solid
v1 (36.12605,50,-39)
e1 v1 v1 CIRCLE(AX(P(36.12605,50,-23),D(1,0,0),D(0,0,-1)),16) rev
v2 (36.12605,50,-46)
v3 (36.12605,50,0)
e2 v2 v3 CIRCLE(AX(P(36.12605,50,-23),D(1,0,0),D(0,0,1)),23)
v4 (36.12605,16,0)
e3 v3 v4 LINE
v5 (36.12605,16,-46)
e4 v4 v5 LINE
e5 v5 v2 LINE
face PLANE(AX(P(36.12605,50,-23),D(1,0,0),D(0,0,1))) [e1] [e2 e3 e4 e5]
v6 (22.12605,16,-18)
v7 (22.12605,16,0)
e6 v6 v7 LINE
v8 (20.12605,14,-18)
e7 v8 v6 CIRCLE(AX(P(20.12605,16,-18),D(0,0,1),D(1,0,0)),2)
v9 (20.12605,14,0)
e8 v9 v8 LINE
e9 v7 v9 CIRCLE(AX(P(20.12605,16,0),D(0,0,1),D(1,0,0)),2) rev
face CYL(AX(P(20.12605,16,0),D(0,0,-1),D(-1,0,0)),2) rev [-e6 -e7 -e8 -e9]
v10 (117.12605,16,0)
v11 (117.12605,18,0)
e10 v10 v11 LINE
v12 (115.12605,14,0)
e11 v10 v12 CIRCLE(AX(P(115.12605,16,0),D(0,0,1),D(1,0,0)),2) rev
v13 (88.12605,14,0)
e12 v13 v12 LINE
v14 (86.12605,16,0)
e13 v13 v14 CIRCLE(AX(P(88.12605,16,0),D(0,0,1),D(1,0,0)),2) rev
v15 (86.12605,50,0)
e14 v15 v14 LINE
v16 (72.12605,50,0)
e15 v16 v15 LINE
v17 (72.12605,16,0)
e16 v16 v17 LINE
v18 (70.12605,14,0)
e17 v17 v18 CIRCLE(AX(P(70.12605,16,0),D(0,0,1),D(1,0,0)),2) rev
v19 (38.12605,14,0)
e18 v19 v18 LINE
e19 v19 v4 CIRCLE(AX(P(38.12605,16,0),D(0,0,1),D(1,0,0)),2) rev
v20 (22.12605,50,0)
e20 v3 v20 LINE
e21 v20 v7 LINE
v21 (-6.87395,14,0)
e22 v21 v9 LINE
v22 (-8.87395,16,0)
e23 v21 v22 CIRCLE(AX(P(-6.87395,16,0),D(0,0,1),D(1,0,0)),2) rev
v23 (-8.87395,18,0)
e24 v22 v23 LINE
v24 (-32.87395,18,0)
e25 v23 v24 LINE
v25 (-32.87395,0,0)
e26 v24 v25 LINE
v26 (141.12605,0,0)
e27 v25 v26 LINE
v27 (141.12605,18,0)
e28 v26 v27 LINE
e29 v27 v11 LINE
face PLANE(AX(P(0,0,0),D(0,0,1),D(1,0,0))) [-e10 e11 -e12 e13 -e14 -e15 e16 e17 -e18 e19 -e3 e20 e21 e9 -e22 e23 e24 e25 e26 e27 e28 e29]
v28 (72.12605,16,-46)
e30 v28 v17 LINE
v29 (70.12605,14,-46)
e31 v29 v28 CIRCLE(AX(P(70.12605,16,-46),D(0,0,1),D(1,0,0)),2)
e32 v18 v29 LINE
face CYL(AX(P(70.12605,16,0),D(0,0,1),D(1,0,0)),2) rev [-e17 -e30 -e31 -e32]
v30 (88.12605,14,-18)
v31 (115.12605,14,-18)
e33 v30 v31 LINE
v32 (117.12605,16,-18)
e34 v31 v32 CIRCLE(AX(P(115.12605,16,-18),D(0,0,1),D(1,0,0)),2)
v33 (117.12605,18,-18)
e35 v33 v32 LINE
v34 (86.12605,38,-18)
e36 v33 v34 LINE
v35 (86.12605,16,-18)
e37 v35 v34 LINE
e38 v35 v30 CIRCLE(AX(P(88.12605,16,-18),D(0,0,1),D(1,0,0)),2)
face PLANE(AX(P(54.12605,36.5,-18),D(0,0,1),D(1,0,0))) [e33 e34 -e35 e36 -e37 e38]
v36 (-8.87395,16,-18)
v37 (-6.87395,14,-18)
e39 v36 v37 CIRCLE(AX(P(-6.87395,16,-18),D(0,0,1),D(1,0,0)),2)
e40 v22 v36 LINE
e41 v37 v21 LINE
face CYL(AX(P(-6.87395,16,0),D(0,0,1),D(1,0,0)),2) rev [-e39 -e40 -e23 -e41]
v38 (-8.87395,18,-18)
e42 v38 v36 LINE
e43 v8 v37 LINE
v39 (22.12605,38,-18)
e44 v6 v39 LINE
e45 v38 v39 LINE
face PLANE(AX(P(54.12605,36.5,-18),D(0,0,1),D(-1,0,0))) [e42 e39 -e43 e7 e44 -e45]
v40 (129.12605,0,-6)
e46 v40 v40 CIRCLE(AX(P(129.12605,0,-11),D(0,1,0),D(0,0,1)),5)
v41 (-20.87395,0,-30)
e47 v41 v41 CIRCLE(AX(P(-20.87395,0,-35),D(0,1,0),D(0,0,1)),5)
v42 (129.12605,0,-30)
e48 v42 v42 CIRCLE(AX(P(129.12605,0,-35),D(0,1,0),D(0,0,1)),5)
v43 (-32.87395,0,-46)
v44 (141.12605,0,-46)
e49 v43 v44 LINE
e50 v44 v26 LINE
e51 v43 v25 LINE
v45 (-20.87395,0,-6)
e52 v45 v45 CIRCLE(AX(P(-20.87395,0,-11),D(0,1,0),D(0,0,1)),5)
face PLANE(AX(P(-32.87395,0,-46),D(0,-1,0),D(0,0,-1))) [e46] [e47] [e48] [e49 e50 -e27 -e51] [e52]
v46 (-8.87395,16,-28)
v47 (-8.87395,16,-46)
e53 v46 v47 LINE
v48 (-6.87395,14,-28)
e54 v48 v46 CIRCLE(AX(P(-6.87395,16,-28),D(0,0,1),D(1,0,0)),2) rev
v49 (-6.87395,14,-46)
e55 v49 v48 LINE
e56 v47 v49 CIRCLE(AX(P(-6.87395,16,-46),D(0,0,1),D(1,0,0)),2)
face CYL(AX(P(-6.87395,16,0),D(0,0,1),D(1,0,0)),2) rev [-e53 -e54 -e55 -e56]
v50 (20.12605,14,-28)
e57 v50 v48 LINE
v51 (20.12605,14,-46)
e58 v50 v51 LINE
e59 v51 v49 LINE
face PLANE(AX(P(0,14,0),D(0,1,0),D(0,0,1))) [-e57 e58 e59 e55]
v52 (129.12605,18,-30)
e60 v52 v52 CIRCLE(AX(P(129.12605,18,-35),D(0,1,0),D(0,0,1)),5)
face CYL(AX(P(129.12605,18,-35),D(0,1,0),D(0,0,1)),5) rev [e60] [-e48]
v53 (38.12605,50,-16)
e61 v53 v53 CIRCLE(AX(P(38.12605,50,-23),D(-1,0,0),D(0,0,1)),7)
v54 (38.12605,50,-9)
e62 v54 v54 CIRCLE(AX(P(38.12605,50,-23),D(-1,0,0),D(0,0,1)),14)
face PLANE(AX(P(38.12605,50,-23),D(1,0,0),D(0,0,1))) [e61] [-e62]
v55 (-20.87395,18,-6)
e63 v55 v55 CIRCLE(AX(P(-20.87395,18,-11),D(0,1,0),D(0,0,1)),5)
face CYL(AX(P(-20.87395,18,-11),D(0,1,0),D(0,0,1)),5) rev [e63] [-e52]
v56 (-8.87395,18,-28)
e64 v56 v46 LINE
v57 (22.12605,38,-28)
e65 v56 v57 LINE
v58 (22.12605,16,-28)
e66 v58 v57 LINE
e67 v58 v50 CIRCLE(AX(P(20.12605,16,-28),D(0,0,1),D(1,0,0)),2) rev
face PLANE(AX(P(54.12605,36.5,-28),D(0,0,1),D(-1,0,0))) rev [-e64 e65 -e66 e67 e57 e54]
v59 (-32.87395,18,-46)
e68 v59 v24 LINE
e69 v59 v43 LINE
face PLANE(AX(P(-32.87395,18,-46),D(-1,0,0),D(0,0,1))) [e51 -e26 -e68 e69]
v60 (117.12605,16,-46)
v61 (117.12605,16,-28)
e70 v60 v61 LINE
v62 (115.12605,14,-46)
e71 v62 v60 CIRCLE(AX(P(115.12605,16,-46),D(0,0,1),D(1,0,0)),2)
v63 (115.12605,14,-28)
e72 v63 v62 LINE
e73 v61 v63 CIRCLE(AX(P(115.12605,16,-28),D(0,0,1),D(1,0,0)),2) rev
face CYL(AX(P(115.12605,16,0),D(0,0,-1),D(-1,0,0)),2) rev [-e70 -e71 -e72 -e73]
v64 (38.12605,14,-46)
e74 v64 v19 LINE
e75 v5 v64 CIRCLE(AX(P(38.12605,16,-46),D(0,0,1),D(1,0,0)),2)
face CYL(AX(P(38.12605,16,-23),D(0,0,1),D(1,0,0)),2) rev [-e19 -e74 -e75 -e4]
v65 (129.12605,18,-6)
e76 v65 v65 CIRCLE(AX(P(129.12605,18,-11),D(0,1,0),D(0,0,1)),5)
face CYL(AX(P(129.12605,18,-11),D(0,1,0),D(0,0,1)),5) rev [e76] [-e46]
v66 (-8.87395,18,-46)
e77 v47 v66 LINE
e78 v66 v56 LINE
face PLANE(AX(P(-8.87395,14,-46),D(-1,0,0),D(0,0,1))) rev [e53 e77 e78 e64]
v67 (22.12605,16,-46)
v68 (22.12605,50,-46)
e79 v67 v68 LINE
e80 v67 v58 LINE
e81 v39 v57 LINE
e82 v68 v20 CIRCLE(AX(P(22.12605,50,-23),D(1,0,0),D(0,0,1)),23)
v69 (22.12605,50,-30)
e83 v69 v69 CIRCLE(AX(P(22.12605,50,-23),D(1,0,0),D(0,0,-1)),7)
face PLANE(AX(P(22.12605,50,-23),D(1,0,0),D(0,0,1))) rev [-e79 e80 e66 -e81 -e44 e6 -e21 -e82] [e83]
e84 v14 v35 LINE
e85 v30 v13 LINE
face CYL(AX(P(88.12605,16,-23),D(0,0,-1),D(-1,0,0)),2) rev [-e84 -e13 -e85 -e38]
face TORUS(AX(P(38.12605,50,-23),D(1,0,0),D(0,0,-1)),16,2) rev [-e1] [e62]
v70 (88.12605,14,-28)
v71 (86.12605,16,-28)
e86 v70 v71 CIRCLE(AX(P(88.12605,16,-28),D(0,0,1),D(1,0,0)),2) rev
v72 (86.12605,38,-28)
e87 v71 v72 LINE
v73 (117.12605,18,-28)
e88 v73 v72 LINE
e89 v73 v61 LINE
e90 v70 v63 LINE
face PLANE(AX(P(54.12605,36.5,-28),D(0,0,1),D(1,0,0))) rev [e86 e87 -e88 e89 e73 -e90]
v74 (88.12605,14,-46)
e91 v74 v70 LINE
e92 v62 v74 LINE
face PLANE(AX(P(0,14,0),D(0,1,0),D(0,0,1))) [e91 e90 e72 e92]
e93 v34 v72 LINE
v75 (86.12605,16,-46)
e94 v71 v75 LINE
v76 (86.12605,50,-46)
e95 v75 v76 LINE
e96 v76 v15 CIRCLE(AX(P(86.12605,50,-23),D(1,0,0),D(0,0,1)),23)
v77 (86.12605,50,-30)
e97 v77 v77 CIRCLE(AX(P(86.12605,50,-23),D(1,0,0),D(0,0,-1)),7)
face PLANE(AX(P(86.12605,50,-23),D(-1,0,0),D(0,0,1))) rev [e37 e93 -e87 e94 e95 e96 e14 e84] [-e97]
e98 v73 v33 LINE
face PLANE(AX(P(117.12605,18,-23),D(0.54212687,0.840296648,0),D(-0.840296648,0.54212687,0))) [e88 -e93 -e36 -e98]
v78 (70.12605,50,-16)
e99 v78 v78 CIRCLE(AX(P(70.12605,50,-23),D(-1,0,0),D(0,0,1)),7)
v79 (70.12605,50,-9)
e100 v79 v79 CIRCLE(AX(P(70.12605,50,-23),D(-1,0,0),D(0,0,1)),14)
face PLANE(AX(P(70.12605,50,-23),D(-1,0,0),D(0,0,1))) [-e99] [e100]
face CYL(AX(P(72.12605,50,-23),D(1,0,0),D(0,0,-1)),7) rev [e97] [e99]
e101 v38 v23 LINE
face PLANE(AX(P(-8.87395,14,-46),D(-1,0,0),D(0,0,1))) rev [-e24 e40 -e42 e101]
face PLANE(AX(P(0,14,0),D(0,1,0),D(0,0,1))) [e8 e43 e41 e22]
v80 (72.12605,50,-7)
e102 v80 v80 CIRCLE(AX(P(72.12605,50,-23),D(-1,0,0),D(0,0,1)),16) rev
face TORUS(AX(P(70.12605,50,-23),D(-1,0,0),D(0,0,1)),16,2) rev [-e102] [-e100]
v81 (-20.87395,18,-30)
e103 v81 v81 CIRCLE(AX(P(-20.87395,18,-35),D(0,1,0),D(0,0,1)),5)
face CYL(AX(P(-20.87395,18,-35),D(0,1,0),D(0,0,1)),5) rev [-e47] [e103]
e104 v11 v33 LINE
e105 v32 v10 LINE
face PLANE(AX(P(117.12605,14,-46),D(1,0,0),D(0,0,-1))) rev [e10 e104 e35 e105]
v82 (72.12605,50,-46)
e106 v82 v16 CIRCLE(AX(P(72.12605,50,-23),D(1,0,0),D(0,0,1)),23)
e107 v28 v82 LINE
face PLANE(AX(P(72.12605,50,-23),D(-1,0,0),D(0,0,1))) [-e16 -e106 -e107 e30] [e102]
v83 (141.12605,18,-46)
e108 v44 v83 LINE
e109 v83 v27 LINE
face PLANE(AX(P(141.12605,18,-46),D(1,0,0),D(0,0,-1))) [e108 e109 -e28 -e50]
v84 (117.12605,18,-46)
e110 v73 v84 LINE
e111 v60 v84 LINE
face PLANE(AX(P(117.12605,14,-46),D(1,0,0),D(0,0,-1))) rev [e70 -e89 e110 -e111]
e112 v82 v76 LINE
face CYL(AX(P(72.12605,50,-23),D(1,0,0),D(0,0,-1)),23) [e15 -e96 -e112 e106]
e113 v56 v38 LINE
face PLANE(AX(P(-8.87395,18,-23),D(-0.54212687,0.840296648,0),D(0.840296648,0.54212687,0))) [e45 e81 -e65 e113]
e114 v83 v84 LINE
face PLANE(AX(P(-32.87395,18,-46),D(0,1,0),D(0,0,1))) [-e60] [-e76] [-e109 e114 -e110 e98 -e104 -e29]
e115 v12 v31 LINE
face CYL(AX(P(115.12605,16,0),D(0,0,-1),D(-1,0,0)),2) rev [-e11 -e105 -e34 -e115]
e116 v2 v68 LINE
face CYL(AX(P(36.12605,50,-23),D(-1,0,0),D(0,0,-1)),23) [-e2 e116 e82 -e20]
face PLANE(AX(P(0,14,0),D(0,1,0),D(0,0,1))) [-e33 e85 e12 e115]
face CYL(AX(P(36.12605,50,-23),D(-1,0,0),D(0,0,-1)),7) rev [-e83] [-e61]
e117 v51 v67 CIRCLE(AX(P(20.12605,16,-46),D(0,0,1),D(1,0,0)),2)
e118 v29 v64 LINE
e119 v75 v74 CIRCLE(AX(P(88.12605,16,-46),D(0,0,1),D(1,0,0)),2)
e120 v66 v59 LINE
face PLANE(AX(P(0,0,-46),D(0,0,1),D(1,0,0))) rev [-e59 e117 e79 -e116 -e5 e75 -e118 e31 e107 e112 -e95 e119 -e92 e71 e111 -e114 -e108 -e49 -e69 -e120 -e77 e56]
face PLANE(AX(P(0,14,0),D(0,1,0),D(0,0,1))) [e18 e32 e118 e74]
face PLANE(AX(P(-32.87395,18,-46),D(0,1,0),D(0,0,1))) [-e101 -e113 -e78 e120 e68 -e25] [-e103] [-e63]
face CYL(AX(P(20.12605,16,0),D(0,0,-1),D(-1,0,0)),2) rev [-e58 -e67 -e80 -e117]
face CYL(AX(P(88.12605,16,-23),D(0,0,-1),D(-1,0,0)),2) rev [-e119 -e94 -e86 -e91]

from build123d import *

# Parameters (mm, degrees)
SKETCH1_W                  = 174
SKETCH1_H                  = 18
BOSS_EXTRUDE1_DEPTH        = 46
SKETCH3_W                  = 126
SKETCH3_H                  = 46
CUT_EXTRUDE1_DEPTH         = 4
SKETCH4_R                  = 7
BOSS_EXTRUDE2_DEPTH        = 14
SKETCH5_R                  = 14
SKETCH5_R_2                = 7
BOSS_EXTRUDE3_DEPTH        = 2
RIB1_REACH                 = 162.545
SKETCH6_WALL_W             = 359.980893116
SKETCH6_WALL_H             = 10
FILLET1_R                  = 2
FILLET2_R                  = 2
FILLET3_R                  = 2
F_10_0_10_DIAMETER_HOLE5_D = 10


with BuildPart() as part:
    # Sketch1 → Boss-Extrude1 (new body)
    with BuildSketch(Plane.XY):
        with Locations((54.12605042, 9)):
            Rectangle(SKETCH1_W, SKETCH1_H)
    extrude(amount=-BOSS_EXTRUDE1_DEPTH)

    # Sketch3 → Cut-Extrude1 (cut)
    with BuildSketch(Plane(origin=(0, 18, 0), x_dir=(1, 0, 0), z_dir=(0, 1, 0))):
        with Locations((54.12605042, 23)):
            Rectangle(SKETCH3_W, SKETCH3_H)
    extrude(amount=-CUT_EXTRUDE1_DEPTH, mode=Mode.SUBTRACT)

    # Sketch4 → Boss-Extrude2 (add)
    with BuildSketch(Plane(origin=(86.12605042, 0, 0), x_dir=(0, 0, -1), z_dir=(1, 0, 0))):
        with BuildLine():
            Line((46, 14), (0, 14))
            Line((0, 14), (0, 50))
            ThreePointArc((0, 50), (23, 73), (46, 50))
            Line((46, 50), (46, 14))
        make_face()
        with Locations((23, 50)):
            Circle(SKETCH4_R, mode=Mode.SUBTRACT)
    extrude(amount=-BOSS_EXTRUDE2_DEPTH)

    # Sketch5 → Boss-Extrude3 (add)
    with BuildSketch(Plane.ZY.offset(-72.12605042)):
        with Locations((-23, 50)):
            Circle(SKETCH5_R)
        with Locations(Location((-23, 50, 0), (0, 0, 180))):
            Circle(SKETCH5_R_2, mode=Mode.SUBTRACT)
    extrude(amount=BOSS_EXTRUDE3_DEPTH)

    # Sketch6 wall → Rib1 (add, up to next)
    with BuildSketch(Plane(origin=(101.62605042, 28, -23), x_dir=(-0.840296648224, 0.542126869822, 0), z_dir=(-0.542126869822, -0.840296648224, 0)), mode=Mode.PRIVATE) as rib1_sk1:
        Rectangle(SKETCH6_WALL_W, SKETCH6_WALL_H)
    rib1_tool1 = extrude(rib1_sk1.sketch, amount=RIB1_REACH, mode=Mode.PRIVATE) - part.part
    add(rib1_tool1.solids().sort_by_distance((101.62605042, 28, -23))[0])

    # Mirror4: part across plane


with BuildPart() as part_1:
    add(part.part)
    add(part.part.mirror(Plane(origin=(54.12605042, 0, 0), x_dir=(0, 0, 1), z_dir=(1, 0, 0))))

    # Fillet1
    fillet1_edges = [part_1.edges().sort_by_distance(p)[0] for p in [
        (-8.87394958, 14, -9),
        (22.12605042, 14, -37),
        (36.12605042, 14, -23),
        (22.12605042, 14, -9),
        (-8.87394958, 14, -37),
        (117.12605042, 14, -9),
        (72.12605042, 14, -23),
        (86.12605042, 14, -9),
        (86.12605042, 14, -37),
        (117.12605042, 14, -37),
    ]]
    fillet(fillet1_edges, radius=FILLET1_R)

    # Fillet2
    fillet2_edges = [part_1.edges().sort_by_distance(p)[0] for p in [
        (36.12605042, 50, -37),
    ]]
    fillet(fillet2_edges, radius=FILLET2_R - 0.0001)  # a hair under: the kernel refuses the full size

    # Fillet3
    fillet3_edges = [part_1.edges().sort_by_distance(p)[0] for p in [
        (72.12605042, 50, -37),
    ]]
    fillet(fillet3_edges, radius=FILLET3_R - 0.0001)  # a hair under: the kernel refuses the full size

    # Ø10.0 (10) Diameter Hole5 (through all)
    with Locations(Plane(origin=(0, 18, 0), x_dir=(1, 0, 0), z_dir=(0, 1, 0))):
        with Locations((-20.87394958, 35), (-20.87394958, 11), (129.12605042, 35), (129.12605042, 11)):
            Hole(F_10_0_10_DIAMETER_HOLE5_D / 2)


solid = part_1.part
